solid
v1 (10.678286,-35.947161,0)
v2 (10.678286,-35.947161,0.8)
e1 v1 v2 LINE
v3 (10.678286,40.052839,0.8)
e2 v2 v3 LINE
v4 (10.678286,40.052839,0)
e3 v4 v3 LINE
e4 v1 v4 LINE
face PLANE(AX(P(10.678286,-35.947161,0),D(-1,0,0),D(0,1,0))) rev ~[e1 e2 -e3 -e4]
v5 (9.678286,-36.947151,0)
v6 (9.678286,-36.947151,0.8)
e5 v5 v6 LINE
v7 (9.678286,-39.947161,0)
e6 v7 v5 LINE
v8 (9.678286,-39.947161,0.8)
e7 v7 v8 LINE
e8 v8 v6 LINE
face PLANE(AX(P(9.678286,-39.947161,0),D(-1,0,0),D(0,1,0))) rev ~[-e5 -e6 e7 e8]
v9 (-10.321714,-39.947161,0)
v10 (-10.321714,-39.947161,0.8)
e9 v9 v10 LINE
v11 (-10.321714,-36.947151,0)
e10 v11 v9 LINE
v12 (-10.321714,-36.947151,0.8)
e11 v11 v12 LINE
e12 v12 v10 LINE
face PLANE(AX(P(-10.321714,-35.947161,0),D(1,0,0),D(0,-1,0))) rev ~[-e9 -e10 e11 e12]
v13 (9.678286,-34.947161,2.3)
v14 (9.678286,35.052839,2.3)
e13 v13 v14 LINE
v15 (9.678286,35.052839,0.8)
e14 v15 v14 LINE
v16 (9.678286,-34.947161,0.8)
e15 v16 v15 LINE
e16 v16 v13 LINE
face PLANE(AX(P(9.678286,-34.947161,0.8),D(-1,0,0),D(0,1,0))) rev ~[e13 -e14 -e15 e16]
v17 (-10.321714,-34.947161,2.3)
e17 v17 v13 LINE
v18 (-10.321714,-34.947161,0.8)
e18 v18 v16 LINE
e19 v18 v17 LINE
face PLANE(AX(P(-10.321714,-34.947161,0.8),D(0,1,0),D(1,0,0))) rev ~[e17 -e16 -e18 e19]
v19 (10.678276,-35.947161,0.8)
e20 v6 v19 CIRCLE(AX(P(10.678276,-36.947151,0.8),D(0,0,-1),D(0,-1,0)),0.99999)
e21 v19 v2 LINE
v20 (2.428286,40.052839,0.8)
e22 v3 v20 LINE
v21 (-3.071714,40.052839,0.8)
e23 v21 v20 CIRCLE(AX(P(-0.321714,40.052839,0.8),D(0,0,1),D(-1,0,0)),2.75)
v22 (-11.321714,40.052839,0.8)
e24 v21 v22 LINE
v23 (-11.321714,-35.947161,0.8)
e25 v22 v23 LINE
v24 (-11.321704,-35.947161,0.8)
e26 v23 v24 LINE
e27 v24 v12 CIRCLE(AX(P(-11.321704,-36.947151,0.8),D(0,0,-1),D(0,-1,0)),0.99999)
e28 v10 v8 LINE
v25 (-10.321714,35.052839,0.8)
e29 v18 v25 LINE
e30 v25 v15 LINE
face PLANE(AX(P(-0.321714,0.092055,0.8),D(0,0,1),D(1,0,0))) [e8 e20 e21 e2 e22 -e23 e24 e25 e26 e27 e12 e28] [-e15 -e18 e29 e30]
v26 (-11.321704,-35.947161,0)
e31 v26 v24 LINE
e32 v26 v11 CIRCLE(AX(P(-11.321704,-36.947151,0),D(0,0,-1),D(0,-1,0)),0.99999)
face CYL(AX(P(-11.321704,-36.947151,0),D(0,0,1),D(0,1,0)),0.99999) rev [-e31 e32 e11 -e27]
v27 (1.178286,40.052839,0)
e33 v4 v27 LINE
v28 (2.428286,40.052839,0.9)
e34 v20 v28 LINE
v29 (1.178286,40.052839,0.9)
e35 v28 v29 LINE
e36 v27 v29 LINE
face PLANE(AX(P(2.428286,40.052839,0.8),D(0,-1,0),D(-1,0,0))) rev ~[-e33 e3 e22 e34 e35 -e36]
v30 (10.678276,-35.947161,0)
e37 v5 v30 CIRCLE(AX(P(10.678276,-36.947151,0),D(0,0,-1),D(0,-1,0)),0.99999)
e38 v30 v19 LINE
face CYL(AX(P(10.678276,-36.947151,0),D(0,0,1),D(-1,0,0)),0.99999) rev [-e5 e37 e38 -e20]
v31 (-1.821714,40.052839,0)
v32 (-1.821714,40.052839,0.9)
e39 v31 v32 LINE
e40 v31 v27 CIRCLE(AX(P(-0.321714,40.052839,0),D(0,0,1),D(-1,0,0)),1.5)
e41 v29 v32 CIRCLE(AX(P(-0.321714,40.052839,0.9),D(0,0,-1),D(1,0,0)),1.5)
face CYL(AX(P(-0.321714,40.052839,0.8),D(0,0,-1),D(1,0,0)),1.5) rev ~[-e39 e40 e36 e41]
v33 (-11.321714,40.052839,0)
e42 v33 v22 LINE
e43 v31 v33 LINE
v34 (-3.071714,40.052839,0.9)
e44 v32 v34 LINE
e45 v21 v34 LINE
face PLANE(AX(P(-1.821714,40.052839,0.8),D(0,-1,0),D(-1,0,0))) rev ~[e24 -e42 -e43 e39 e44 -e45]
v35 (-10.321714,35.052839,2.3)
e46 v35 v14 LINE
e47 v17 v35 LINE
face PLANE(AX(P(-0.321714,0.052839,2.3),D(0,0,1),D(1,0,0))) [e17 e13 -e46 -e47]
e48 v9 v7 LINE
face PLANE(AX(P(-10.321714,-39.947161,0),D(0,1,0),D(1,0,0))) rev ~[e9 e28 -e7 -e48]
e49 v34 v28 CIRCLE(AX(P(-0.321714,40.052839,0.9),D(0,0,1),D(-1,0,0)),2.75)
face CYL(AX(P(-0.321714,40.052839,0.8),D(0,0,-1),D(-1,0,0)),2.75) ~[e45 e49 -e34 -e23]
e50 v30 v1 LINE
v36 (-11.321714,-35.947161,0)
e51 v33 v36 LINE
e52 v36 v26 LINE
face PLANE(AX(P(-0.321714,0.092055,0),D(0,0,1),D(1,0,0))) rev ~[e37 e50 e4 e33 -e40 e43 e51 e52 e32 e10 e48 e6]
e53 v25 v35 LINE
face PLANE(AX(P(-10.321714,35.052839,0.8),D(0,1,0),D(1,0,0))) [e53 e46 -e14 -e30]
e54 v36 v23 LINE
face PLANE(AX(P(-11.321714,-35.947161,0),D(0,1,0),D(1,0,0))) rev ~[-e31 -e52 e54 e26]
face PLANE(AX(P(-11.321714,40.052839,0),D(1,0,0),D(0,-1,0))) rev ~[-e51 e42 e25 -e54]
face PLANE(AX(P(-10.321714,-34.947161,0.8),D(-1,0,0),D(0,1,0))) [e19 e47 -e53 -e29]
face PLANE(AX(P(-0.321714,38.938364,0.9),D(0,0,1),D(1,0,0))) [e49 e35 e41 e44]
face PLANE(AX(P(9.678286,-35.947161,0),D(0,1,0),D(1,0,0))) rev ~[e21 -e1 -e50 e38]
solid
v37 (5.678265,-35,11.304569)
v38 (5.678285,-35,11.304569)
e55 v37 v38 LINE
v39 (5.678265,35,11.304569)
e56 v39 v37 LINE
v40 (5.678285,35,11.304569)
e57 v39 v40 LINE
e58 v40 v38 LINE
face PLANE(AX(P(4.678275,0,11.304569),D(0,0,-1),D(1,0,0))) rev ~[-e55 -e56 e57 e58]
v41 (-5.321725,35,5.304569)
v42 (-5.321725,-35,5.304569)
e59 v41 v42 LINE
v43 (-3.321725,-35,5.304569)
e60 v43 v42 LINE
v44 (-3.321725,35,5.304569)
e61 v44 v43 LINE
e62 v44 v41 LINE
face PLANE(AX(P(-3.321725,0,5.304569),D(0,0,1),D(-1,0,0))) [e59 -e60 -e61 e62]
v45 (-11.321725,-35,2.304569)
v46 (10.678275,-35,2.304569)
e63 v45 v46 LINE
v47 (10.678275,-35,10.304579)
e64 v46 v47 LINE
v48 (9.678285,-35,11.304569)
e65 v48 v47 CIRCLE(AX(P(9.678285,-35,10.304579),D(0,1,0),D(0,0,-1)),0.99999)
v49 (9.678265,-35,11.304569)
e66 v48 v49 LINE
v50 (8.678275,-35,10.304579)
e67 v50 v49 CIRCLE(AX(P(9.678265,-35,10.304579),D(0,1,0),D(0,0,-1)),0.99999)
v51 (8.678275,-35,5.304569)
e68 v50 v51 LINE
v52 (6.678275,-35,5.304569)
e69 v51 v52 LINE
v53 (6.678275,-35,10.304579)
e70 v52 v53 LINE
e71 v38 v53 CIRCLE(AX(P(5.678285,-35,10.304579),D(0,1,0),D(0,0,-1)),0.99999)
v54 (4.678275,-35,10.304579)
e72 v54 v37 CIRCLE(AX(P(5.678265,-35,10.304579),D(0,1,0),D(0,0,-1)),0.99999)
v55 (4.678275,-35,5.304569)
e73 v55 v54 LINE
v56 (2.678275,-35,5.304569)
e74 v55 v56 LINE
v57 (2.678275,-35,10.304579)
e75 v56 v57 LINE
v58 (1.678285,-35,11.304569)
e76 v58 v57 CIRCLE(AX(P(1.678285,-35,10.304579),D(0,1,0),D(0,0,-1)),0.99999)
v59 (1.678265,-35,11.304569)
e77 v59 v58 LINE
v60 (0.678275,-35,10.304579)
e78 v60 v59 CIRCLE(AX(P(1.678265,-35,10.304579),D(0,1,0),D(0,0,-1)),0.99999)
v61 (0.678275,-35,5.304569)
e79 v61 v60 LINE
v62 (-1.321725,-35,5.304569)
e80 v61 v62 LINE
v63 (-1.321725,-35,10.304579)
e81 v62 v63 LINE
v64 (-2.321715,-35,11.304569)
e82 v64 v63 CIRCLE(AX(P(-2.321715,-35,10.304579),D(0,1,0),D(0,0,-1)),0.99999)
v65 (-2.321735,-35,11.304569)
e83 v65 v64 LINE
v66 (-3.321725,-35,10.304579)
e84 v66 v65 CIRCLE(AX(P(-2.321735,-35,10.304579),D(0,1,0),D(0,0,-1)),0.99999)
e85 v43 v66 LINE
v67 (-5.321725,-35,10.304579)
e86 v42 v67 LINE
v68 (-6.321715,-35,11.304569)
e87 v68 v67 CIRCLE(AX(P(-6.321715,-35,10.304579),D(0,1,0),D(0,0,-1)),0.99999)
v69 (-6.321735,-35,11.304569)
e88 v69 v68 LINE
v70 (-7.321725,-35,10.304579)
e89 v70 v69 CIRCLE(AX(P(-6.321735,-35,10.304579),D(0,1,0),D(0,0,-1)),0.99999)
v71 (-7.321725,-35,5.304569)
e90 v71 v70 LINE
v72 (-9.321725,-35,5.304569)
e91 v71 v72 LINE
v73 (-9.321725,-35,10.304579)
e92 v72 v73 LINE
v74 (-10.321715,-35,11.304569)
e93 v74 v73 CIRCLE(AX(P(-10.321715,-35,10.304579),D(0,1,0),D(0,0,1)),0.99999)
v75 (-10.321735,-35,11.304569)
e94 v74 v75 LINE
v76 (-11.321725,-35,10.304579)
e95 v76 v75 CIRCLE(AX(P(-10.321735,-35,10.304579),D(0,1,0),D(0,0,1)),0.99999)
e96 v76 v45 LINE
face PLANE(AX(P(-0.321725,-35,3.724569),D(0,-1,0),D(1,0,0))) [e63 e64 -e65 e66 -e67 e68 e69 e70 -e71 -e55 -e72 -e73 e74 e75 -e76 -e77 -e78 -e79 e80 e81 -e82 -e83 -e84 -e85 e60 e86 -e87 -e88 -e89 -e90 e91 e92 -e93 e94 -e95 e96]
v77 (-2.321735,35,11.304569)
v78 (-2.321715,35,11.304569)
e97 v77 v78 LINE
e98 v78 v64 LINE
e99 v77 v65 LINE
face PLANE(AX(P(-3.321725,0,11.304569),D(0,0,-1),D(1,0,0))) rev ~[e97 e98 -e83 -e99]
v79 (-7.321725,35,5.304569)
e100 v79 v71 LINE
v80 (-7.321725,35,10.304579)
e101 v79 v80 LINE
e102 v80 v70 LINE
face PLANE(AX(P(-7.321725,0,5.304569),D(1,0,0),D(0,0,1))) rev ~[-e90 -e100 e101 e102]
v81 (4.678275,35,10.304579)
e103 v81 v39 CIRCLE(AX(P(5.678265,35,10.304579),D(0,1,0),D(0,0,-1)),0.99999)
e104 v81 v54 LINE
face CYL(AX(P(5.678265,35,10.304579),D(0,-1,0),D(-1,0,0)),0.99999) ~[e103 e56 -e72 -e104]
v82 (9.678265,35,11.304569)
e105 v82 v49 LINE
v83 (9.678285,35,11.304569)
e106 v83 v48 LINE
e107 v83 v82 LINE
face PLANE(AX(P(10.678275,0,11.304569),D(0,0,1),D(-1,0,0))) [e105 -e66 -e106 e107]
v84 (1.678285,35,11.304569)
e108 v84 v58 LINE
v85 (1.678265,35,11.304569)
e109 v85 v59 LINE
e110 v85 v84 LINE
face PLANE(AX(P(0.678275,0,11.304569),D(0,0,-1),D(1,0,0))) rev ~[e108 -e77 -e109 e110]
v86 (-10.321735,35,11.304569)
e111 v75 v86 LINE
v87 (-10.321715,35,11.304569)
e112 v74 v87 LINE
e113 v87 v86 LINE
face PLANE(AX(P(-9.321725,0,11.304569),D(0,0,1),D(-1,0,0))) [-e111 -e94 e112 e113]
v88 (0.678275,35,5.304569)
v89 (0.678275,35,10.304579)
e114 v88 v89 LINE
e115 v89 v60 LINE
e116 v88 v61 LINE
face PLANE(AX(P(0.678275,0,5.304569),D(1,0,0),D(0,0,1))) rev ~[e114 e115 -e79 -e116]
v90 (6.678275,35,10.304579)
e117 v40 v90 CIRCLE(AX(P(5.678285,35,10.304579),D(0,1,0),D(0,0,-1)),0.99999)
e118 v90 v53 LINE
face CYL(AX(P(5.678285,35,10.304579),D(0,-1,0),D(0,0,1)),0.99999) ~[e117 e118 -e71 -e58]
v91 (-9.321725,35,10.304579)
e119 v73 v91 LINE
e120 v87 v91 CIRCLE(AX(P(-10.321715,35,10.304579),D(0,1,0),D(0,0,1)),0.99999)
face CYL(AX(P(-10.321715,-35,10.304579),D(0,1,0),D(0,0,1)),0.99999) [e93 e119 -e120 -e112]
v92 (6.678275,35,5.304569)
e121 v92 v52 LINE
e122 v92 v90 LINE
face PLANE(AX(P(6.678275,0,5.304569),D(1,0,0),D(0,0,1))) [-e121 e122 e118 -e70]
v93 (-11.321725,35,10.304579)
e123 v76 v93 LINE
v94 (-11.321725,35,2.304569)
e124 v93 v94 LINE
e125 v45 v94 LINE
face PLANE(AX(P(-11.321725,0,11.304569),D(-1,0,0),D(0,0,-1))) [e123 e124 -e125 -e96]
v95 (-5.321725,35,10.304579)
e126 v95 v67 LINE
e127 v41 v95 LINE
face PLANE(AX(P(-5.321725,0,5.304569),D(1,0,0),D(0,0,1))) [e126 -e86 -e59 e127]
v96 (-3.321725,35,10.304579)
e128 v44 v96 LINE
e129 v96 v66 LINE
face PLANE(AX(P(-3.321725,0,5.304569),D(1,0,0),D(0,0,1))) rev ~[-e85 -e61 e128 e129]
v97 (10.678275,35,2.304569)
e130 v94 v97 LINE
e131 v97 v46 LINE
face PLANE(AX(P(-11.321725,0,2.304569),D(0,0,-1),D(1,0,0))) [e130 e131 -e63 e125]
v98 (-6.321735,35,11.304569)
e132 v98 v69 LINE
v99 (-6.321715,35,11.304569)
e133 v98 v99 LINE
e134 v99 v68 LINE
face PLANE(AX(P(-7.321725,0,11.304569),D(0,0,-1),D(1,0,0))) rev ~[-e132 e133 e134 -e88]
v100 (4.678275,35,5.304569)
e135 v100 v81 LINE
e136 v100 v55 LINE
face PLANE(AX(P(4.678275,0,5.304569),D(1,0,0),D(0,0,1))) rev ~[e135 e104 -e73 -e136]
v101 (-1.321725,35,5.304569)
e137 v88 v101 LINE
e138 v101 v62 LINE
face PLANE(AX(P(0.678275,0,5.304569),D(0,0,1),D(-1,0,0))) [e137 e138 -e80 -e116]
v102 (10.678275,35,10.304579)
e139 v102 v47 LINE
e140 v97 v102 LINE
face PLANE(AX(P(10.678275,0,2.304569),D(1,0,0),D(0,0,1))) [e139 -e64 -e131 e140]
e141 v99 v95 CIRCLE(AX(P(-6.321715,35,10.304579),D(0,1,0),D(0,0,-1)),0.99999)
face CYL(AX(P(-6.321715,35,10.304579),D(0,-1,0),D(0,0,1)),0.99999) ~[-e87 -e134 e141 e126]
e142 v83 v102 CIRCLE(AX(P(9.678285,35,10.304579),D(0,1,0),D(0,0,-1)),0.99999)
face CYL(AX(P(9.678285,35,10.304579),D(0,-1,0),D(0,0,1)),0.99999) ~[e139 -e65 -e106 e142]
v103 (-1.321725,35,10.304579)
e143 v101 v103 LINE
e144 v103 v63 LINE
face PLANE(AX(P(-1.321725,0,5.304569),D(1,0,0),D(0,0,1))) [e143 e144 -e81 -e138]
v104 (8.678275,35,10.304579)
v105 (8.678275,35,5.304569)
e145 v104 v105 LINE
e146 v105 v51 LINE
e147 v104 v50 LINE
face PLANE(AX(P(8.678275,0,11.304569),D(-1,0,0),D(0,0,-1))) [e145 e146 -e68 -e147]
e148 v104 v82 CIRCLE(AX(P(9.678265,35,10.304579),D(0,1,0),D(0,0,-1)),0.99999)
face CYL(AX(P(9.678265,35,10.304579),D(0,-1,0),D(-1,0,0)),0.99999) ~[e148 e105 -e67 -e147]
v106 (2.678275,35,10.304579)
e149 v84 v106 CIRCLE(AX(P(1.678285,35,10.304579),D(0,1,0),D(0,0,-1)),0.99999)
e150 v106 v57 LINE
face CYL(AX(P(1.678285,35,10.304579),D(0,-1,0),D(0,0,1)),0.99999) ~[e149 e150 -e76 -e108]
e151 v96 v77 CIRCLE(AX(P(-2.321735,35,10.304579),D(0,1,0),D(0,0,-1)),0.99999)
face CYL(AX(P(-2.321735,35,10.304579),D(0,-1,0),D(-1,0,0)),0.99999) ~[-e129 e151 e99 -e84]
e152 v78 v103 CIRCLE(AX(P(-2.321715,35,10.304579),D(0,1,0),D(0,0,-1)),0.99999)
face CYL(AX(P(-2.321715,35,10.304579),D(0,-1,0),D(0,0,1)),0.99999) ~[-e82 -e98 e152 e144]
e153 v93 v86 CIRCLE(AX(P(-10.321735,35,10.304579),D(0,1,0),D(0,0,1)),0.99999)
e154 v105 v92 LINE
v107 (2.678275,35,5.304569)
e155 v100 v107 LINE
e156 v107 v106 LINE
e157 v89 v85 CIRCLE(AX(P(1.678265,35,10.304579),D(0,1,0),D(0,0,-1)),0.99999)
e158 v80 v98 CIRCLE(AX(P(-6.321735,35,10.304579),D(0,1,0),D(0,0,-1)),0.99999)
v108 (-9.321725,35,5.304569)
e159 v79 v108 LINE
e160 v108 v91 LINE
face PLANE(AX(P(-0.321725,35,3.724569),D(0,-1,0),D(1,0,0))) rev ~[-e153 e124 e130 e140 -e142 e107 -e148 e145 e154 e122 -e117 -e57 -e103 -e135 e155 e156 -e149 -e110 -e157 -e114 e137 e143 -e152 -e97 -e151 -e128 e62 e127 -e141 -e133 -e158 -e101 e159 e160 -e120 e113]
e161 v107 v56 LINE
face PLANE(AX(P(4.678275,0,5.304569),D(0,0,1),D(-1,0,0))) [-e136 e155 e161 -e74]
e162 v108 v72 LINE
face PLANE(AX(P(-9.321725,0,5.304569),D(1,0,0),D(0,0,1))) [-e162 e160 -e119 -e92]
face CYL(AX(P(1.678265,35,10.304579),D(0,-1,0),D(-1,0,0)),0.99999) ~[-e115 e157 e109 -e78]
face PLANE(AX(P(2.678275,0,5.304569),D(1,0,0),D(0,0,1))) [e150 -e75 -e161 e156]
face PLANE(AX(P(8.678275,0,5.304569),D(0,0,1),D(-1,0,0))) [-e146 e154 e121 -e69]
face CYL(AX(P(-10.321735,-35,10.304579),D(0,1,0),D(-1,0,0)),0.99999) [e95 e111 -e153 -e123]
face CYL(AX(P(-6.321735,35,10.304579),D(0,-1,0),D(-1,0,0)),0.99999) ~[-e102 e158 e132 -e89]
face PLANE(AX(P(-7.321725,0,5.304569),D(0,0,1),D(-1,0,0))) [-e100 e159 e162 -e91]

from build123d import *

# Parameters (mm, degrees)
F1_DEPTH = 0.8
F2_R     = 0.99999
F3_W     = 20
F3_H     = 70
F4_DEPTH = 1.5
F6_DEPTH = 0.801
F7_DEPTH = 0.1
F8_W     = 1
F8_H     = 2
F8_W_2   = 2
F8_H_2   = 6
F9_DEPTH = 35
F10_R    = 0.99999


# Not quite as in the source:
# - a fillet or chamfer is up to 0.001 mm smaller than in the source, because OpenCascade refuses the exact size


with BuildPart() as f1:
    # F0 (on Top) → F1 (new body)
    with BuildSketch(Plane.XY):
        Polygon((10.6782857925, 40.0528391576), (-11.3217142075, 40.0528391576), (-11.3217142075, -35.9471608424), (-10.3217142075, -35.9471608424), (-10.3217142075, -39.9471608424), (9.6782857925, -39.9471608424), (9.6782857925, -35.9471608424), (10.6782857925, -35.9471608424), align=None)
    extrude(amount=F1_DEPTH)

    # F2 (radius 1 in the source; OpenCascade refuses exactly that, so slightly less here)
    f2_edges = [f1.edges().sort_by_distance(p)[0] for p in [
        (9.678286, -35.947161, 0.4),
        (-10.321714, -35.947161, 0.4),
    ]]
    fillet(f2_edges, radius=F2_R)

    # F3 (on face) → F4 (join)
    with BuildSketch(Plane.XY.offset(0.8)):
        with Locations((-0.3217142075, 0.0528391576)):
            Rectangle(F3_W, F3_H)
    extrude(amount=F4_DEPTH)

    # F5 (on face) → F6 (cut, through all)
    with BuildSketch(Plane.XY.offset(0.8)):
        with BuildLine():
            ThreePointArc((-1.8217142075, 40.0528391576), (-0.3217142075, 38.5528391576), (1.1782857925, 40.0528391576))
            Line((1.1782857925, 40.0528391576), (-1.8217142075, 40.0528391576))
        make_face()
    extrude(amount=-F6_DEPTH, mode=Mode.SUBTRACT)

    # F5 (on face) → F7 (join)
    with BuildSketch(Plane.XY.offset(0.8)):
        with BuildLine():
            Line((2.4282857925, 40.0528391576), (1.1782857925, 40.0528391576))
            ThreePointArc((1.1782857925, 40.0528391576), (-0.3217142075, 38.5528391576), (-1.8217142075, 40.0528391576))
            Line((-1.8217142075, 40.0528391576), (-3.0717142075, 40.0528391576))
            ThreePointArc((-3.0717142075, 40.0528391576), (-0.3217142075, 37.3028391576), (2.4282857925, 40.0528391576))
        make_face()
    extrude(amount=F7_DEPTH)


with BuildPart() as f9:
    # F8 (on Front) → F9 (new body, symmetric)
    with BuildSketch(Plane.XZ):
        Polygon((-11.321724645, 3.3045688875), (-11.321724645, 2.3045688875), (10.678275355, 2.3045688875), (10.678275355, 3.3045688875), (9.678275355, 3.3045688875), (9.678275355, 5.3045688875), (8.678275355, 5.3045688875), (6.678275355, 5.3045688875), (4.678275355, 5.3045688875), (2.678275355, 5.3045688875), (0.678275355, 5.3045688875), (-1.321724645, 5.3045688875), (-3.321724645, 5.3045688875), (-5.321724645, 5.3045688875), (-7.321724645, 5.3045688875), (-9.321724645, 5.3045688875), (-10.321724645, 5.3045688875), (-10.321724645, 3.3045688875), align=None)
        with Locations((-10.821724645, 4.3045688875)):
            Rectangle(F8_W, F8_H)
        with Locations((10.178275355, 4.3045688875)):
            Rectangle(F8_W, F8_H)
        Polygon((-11.321724645, 11.3045688875), (-11.321724645, 5.3045688875), (-10.321724645, 5.3045688875), (-9.321724645, 5.3045688875), (-9.321724645, 11.3045688875), align=None)
        Polygon((9.678275355, 5.3045688875), (10.678275355, 5.3045688875), (10.678275355, 11.3045688875), (8.678275355, 11.3045688875), (8.678275355, 5.3045688875), align=None)
        with Locations((-6.321724645, 8.3045688875)):
            Rectangle(F8_W_2, F8_H_2)
        with Locations((5.678275355, 8.3045688875)):
            Rectangle(F8_W_2, F8_H_2)
        with Locations((-2.321724645, 8.3045688875)):
            Rectangle(F8_W_2, F8_H_2)
        with Locations((1.678275355, 8.3045688875)):
            Rectangle(F8_W_2, F8_H_2)
    extrude(amount=F9_DEPTH, both=True)

    # F10 (radius 1 in the source; OpenCascade refuses exactly that, so slightly less here)
    f10_edges = [f9.edges().sort_by_distance(p)[0] for p in [
        (-11.321725, 0, 11.304569),
        (-9.321725, 0, 11.304569),
        (-7.321725, 0, 11.304569),
        (-5.321725, 0, 11.304569),
        (-3.321725, 0, 11.304569),
        (-1.321725, 0, 11.304569),
        (0.678275, 0, 11.304569),
        (2.678275, 0, 11.304569),
        (4.678275, 0, 11.304569),
        (6.678275, 0, 11.304569),
        (8.678275, 0, 11.304569),
        (10.678275, 0, 11.304569),
    ]]
    fillet(f10_edges, radius=F10_R)


solid = Compound([f1.part, f9.part])
